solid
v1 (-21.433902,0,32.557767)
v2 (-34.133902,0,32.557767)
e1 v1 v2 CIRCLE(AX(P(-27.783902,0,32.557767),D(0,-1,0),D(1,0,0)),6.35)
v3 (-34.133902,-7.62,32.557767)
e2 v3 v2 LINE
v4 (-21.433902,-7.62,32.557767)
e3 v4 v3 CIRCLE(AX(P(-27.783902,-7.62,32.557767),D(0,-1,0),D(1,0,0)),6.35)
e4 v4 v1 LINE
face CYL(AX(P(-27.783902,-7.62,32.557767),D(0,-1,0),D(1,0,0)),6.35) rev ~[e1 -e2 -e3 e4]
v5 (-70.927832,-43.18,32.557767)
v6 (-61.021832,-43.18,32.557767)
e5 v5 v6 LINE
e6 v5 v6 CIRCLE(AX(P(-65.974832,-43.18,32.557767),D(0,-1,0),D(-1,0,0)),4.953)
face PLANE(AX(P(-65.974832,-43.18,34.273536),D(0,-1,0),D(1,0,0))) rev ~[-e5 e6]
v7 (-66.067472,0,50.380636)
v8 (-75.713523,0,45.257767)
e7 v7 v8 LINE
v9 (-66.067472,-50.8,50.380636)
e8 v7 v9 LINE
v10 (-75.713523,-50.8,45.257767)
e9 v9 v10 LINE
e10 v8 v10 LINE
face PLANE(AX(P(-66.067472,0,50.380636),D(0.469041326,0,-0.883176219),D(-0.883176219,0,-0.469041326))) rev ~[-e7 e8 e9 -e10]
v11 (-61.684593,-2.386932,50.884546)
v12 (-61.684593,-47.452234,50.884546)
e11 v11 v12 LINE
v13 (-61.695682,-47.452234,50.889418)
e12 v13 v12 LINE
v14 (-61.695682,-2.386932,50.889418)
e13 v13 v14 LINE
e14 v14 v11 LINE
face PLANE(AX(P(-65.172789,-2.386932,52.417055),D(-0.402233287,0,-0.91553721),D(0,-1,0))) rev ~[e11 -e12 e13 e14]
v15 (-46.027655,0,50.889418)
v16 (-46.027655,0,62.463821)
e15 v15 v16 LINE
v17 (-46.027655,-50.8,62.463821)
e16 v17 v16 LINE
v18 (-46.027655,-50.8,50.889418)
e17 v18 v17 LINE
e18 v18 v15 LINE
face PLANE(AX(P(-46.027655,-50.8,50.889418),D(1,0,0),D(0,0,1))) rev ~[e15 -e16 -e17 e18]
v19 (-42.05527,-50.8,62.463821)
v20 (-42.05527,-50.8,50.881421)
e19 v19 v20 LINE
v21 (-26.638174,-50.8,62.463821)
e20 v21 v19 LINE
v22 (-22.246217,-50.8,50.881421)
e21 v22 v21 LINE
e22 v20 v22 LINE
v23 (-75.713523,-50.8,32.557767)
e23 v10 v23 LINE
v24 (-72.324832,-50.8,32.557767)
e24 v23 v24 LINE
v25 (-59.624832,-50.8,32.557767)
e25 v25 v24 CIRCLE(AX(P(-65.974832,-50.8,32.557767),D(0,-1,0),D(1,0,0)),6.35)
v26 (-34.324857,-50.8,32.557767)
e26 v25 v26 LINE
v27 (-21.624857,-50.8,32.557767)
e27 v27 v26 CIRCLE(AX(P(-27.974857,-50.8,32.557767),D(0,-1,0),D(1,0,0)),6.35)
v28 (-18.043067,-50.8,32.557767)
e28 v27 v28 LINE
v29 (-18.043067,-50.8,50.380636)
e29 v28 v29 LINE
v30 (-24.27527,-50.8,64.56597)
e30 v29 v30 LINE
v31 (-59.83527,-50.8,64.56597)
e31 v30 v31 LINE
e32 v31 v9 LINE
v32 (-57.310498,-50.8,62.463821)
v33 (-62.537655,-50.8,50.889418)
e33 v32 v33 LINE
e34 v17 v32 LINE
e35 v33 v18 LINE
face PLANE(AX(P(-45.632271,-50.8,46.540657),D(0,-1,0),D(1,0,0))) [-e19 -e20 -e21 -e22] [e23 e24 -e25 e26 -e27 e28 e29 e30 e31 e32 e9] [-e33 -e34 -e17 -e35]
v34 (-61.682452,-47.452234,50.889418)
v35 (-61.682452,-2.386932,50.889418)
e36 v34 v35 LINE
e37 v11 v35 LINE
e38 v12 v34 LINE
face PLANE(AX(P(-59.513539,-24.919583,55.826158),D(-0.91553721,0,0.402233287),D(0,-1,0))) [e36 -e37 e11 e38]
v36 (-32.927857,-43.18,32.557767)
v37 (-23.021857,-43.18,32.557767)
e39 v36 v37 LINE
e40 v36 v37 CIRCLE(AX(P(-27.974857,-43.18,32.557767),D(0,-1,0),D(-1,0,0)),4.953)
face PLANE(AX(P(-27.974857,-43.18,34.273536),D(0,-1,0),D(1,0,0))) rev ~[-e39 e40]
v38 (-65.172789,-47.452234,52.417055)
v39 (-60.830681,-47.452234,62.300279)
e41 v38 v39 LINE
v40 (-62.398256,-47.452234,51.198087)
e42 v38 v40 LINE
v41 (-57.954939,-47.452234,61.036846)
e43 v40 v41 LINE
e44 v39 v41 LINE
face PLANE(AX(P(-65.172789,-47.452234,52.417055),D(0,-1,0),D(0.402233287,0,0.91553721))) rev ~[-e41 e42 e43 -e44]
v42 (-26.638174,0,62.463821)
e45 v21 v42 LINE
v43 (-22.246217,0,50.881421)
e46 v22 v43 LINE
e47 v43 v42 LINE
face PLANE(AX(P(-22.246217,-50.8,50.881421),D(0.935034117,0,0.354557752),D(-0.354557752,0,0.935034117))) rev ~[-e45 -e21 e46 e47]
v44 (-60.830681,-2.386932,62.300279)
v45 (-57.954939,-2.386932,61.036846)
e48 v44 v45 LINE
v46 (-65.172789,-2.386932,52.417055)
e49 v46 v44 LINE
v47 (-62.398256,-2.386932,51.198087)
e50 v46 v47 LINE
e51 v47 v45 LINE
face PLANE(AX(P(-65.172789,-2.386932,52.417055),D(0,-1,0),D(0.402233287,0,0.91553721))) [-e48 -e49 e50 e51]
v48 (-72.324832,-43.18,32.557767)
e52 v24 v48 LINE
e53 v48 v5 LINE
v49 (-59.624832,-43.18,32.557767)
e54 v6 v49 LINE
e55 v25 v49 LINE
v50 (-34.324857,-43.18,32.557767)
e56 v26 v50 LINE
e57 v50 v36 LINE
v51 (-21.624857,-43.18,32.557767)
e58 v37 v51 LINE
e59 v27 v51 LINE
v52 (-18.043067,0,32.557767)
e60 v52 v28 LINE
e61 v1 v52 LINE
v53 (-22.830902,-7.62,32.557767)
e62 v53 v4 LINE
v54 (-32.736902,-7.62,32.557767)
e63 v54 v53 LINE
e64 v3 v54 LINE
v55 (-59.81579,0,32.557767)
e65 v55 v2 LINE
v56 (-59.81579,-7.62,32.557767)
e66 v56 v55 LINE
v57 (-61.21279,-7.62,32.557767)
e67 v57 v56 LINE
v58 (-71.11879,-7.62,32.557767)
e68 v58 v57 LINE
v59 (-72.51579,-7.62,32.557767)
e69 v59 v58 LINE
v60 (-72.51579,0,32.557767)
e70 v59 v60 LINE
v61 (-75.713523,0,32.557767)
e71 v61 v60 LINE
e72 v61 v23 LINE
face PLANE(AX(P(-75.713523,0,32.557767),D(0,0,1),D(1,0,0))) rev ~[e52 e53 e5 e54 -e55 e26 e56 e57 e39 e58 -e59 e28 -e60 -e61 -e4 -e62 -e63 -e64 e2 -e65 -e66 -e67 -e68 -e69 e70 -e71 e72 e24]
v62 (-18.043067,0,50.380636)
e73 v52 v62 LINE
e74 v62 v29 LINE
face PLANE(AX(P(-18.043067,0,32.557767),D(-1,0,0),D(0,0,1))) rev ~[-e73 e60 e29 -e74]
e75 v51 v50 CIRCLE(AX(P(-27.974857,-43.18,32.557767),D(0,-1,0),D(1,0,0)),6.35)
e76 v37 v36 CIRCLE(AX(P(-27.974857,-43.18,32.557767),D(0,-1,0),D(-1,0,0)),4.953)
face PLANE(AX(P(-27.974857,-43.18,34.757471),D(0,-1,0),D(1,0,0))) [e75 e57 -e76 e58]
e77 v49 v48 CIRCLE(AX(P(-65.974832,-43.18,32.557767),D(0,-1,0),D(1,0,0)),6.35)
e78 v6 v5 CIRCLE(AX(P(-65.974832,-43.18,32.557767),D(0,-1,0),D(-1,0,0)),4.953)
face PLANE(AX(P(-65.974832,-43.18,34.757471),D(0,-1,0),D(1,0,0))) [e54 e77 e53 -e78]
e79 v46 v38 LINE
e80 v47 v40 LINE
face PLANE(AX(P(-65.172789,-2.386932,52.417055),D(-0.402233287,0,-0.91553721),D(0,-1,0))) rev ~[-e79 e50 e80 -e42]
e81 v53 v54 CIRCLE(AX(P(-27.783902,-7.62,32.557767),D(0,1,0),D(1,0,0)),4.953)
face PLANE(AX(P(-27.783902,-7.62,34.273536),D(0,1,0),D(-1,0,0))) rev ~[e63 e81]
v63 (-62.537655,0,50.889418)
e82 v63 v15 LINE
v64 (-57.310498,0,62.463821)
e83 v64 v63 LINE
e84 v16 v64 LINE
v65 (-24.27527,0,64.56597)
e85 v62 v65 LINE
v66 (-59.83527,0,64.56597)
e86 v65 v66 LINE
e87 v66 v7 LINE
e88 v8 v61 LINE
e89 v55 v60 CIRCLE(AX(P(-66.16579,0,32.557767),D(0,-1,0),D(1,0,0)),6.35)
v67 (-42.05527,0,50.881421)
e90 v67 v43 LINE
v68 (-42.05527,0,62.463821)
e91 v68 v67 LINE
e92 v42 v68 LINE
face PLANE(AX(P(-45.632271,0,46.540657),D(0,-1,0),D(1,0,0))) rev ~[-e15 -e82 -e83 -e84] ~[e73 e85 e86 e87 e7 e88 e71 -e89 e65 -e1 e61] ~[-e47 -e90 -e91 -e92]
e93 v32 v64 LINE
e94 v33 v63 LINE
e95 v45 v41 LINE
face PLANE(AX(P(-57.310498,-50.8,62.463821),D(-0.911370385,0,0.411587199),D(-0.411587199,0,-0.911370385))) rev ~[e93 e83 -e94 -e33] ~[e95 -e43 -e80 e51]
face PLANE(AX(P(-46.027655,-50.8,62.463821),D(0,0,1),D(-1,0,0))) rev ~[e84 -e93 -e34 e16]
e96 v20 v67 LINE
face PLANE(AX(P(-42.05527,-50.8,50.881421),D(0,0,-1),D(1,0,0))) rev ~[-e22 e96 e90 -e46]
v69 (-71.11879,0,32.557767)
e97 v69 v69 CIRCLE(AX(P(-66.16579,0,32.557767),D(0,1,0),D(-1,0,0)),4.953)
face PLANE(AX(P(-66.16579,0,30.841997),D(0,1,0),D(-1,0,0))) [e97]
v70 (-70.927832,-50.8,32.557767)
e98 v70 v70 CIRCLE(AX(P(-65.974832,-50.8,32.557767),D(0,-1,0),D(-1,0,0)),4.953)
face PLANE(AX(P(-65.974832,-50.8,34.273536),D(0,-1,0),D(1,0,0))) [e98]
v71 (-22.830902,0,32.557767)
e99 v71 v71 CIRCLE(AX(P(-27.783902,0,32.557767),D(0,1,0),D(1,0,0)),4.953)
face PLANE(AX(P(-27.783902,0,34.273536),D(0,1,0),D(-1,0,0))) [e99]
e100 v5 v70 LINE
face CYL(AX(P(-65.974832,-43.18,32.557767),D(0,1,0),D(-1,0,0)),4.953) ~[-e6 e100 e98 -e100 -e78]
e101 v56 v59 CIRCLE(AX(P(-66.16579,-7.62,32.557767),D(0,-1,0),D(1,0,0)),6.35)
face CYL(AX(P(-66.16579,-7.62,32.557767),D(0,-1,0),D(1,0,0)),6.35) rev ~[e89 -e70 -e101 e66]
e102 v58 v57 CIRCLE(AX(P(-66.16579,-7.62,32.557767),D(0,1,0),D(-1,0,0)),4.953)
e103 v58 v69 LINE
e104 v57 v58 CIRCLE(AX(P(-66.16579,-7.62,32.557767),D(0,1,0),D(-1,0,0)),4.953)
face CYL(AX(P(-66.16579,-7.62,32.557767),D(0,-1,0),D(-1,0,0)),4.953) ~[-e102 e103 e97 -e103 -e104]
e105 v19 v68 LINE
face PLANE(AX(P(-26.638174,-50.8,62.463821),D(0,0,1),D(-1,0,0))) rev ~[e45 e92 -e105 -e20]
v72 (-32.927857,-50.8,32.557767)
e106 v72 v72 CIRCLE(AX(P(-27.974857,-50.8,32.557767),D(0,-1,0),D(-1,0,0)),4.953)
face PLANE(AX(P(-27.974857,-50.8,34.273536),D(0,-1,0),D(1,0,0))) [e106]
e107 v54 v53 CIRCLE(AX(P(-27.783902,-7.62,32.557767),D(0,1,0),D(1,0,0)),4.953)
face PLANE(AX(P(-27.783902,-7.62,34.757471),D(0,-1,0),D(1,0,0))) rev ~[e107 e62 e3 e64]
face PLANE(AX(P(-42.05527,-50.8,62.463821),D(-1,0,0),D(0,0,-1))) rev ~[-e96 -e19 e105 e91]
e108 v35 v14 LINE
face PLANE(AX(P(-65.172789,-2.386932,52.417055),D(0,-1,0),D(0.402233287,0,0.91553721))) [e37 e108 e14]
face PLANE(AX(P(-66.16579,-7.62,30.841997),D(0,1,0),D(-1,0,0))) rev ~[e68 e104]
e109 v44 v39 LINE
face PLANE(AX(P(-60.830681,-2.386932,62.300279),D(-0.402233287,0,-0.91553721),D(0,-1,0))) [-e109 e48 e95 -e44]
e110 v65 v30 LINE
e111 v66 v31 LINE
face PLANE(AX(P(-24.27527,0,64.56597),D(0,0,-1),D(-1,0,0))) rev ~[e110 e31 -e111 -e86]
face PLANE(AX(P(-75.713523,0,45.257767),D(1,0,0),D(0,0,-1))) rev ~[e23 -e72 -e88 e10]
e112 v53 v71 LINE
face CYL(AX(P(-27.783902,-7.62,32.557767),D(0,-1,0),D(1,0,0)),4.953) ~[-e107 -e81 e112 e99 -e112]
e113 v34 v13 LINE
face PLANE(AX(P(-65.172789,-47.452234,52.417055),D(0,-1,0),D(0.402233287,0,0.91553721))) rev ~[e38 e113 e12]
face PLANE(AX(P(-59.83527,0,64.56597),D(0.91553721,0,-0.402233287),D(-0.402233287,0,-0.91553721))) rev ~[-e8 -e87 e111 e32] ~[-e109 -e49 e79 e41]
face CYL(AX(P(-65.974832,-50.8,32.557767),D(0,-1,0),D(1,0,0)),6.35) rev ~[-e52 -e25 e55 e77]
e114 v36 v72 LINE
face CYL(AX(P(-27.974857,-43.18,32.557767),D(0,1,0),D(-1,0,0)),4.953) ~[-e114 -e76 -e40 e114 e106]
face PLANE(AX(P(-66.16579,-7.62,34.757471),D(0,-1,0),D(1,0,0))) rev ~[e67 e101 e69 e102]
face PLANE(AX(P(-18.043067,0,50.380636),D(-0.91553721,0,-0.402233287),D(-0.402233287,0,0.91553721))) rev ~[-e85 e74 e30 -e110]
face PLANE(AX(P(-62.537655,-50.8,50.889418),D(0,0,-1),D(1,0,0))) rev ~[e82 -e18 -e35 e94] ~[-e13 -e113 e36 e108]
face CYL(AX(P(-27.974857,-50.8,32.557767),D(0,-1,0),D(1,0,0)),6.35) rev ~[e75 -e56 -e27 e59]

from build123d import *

# Parameters (mm, degrees)
F1_DEPTH         = 50.8
F3_DEPTH         = 7.62
F3_COPIES_COUNT  = 2
F3_COPIES_PITCH  = 43.180422
F3_COPIES1_COUNT = 2
F3_COPIES1_PITCH = 57.645984
F5_DEPTH         = 7.62
F7_DEPTH         = 7.62
F9_DEPTH         = 7.62
F11_DEPTH        = 76.2
F13_DEPTH        = 76.2
F14_W            = 45.0653012376
F14_H            = 10.795
F15_DEPTH        = 3.81
F17_DEPTH        = 7.62
F19_DEPTH        = 7.62
F21_DEPTH        = 7.62
F23_DEPTH        = 7.62


# Not quite as in the source:
# - a pattern or mirror of a feature is missing from the dataset's text; its kind, count and spacing are read off the source's solid


with BuildPart() as f1:
    # F0 (on Front) → F1 (new body)
    with BuildSketch(Plane.XZ):
        Polygon((-75.7135227323, 45.2577668846), (-75.7135227323, 32.5577668846), (-18.04306696, 32.5577668846), (-18.04306696, 34.4673171639), (-18.04306696, 50.3806362459), (-24.2752695117, 64.5659697758), (-59.8352695117, 64.5659697758), (-66.0674720634, 50.3806362459), align=None)
    extrude(amount=F1_DEPTH)

    # F2 (on face) → F3 (cut)
    with BuildSketch(Plane.XZ.offset(50.8)):
        with BuildLine():
            Line((-72.3248315811, 32.5577668846), (-59.6248315811, 32.5577668846))
            ThreePointArc((-59.6248315811, 32.5577668846), (-65.9748315811, 38.9077668846), (-72.3248315811, 32.5577668846))
        make_face()
    f3 = extrude(amount=-F3_DEPTH, mode=Mode.SUBTRACT)

    # F3_copies: F3 ×2
    with Locations(*[Vector(-0.004422337, 0.9999902214, 0) * (i * F3_COPIES_PITCH) for i in range(1, F3_COPIES_COUNT)]):
        add(f3, mode=Mode.SUBTRACT)

    # F3_copies1: F3 ×2
    with Locations(*[Vector(0.662508063, 0.749054782, 0) * (i * F3_COPIES1_PITCH) for i in range(1, F3_COPIES1_COUNT)]):
        add(f3, mode=Mode.SUBTRACT)

    # F4 (on face) → F5 (join)
    with BuildSketch(Plane.XZ.offset(43.18)):
        with BuildLine():
            Line((-70.9278315811, 32.5577668846), (-61.0218315811, 32.5577668846))
            ThreePointArc((-61.0218315811, 32.5577668846), (-65.9748315811, 37.5107668846), (-70.9278315811, 32.5577668846))
        make_face()
        with BuildLine():
            ThreePointArc((-70.9278315811, 32.5577668846), (-65.9748315811, 27.6047668846), (-61.0218315811, 32.5577668846))
            Line((-61.0218315811, 32.5577668846), (-70.9278315811, 32.5577668846))
        make_face()
    extrude(amount=F5_DEPTH)

    # F6 (on face) → F7 (cut)
    with BuildSketch(Plane.XZ.offset(50.8)):
        with BuildLine():
            Line((-34.3248570174, 32.5577668846), (-21.6248570174, 32.5577668846))
            ThreePointArc((-21.6248570174, 32.5577668846), (-27.9748570174, 38.9077668846), (-34.3248570174, 32.5577668846))
        make_face()
    extrude(amount=-F7_DEPTH, mode=Mode.SUBTRACT)

    # F8 (on face) → F9 (join)
    with BuildSketch(Plane.XZ.offset(43.18)):
        with BuildLine():
            Line((-32.9278570174, 32.5577668846), (-23.0218570174, 32.5577668846))
            ThreePointArc((-23.0218570174, 32.5577668846), (-27.9748570174, 37.5107668846), (-32.9278570174, 32.5577668846))
        make_face()
        with BuildLine():
            ThreePointArc((-32.9278570174, 32.5577668846), (-27.9748570174, 27.6047668846), (-23.0218570174, 32.5577668846))
            Line((-23.0218570174, 32.5577668846), (-32.9278570174, 32.5577668846))
        make_face()
    extrude(amount=F9_DEPTH)

    # F10 (on face) → F11 (cut)
    with BuildSketch(Plane.XZ.offset(50.8)):
        Polygon((-46.0276552343, 62.4638214125), (-57.3104978095, 62.4638214125), (-62.5376552343, 50.8894175291), (-46.0276552343, 50.8894175291), align=None)
    extrude(amount=-F11_DEPTH, mode=Mode.SUBTRACT)

    # F12 (on face) → F13 (cut)
    with BuildSketch(Plane.XZ.offset(50.8)):
        Polygon((-26.6381744295, 62.4638214125), (-42.0552695117, 62.4638214125), (-42.0552695117, 50.8814214125), (-22.2462173551, 50.8814214125), align=None)
    extrude(amount=-F13_DEPTH, mode=Mode.SUBTRACT)

    # F14 (on face) → F15 (cut)
    with BuildSketch(Plane(origin=(-73.9314589089, 0, 32.4811415881), x_dir=(0, -1, 0), z_dir=(-0.9155372099, 0, 0.4022332872))):
        with Locations((24.9195831129, 27.1725985175)):
            Rectangle(F14_W, F14_H)
    extrude(amount=-F15_DEPTH, mode=Mode.SUBTRACT)

    # F16 (on face) → F17 (cut)
    with BuildSketch(Plane(origin=(0, 0, 0), x_dir=(-1, 0, 0), z_dir=(0, 1, 0))):
        with BuildLine():
            ThreePointArc((21.433902362, 32.5577668846), (27.783902362, 26.2077668846), (34.133902362, 32.5577668846))
            ThreePointArc((34.133902362, 32.5577668846), (27.783902362, 38.9077668846), (21.433902362, 32.5577668846))
        make_face()
    extrude(amount=-F17_DEPTH, mode=Mode.SUBTRACT)

    # F18 (on face) → F19 (join)
    with BuildSketch(Plane(origin=(0, -7.62, 0), x_dir=(-1, 0, 0), z_dir=(0, 1, 0))):
        with BuildLine():
            Line((22.830902362, 32.5577668846), (32.736902362, 32.5577668846))
            ThreePointArc((32.736902362, 32.5577668846), (27.783902362, 37.5107668846), (22.830902362, 32.5577668846))
        make_face()
        with BuildLine():
            ThreePointArc((22.830902362, 32.5577668846), (27.783902362, 27.6047668846), (32.736902362, 32.5577668846))
            Line((32.736902362, 32.5577668846), (22.830902362, 32.5577668846))
        make_face()
    extrude(amount=F19_DEPTH)

    # F20 (on face) → F21 (cut)
    with BuildSketch(Plane(origin=(0, 0, 0), x_dir=(-1, 0, 0), z_dir=(0, 1, 0))):
        with BuildLine():
            ThreePointArc((59.8157899618, 32.5577668846), (66.1657899618, 26.2077668846), (72.5157899618, 32.5577668846))
            ThreePointArc((72.5157899618, 32.5577668846), (66.1657899618, 38.9077668846), (59.8157899618, 32.5577668846))
        make_face()
    extrude(amount=-F21_DEPTH, mode=Mode.SUBTRACT)

    # F22 (on face) → F23 (join)
    with BuildSketch(Plane(origin=(0, -7.62, 0), x_dir=(-1, 0, 0), z_dir=(0, 1, 0))):
        with BuildLine():
            ThreePointArc((61.2127899618, 32.5577668846), (66.1657899618, 27.6047668846), (71.1187899618, 32.5577668846))
            Line((71.1187899618, 32.5577668846), (61.2127899618, 32.5577668846))
        make_face()
        with BuildLine():
            Line((61.2127899618, 32.5577668846), (71.1187899618, 32.5577668846))
            ThreePointArc((71.1187899618, 32.5577668846), (66.1657899618, 37.5107668846), (61.2127899618, 32.5577668846))
        make_face()
    extrude(amount=F23_DEPTH)


solid = f1.part
